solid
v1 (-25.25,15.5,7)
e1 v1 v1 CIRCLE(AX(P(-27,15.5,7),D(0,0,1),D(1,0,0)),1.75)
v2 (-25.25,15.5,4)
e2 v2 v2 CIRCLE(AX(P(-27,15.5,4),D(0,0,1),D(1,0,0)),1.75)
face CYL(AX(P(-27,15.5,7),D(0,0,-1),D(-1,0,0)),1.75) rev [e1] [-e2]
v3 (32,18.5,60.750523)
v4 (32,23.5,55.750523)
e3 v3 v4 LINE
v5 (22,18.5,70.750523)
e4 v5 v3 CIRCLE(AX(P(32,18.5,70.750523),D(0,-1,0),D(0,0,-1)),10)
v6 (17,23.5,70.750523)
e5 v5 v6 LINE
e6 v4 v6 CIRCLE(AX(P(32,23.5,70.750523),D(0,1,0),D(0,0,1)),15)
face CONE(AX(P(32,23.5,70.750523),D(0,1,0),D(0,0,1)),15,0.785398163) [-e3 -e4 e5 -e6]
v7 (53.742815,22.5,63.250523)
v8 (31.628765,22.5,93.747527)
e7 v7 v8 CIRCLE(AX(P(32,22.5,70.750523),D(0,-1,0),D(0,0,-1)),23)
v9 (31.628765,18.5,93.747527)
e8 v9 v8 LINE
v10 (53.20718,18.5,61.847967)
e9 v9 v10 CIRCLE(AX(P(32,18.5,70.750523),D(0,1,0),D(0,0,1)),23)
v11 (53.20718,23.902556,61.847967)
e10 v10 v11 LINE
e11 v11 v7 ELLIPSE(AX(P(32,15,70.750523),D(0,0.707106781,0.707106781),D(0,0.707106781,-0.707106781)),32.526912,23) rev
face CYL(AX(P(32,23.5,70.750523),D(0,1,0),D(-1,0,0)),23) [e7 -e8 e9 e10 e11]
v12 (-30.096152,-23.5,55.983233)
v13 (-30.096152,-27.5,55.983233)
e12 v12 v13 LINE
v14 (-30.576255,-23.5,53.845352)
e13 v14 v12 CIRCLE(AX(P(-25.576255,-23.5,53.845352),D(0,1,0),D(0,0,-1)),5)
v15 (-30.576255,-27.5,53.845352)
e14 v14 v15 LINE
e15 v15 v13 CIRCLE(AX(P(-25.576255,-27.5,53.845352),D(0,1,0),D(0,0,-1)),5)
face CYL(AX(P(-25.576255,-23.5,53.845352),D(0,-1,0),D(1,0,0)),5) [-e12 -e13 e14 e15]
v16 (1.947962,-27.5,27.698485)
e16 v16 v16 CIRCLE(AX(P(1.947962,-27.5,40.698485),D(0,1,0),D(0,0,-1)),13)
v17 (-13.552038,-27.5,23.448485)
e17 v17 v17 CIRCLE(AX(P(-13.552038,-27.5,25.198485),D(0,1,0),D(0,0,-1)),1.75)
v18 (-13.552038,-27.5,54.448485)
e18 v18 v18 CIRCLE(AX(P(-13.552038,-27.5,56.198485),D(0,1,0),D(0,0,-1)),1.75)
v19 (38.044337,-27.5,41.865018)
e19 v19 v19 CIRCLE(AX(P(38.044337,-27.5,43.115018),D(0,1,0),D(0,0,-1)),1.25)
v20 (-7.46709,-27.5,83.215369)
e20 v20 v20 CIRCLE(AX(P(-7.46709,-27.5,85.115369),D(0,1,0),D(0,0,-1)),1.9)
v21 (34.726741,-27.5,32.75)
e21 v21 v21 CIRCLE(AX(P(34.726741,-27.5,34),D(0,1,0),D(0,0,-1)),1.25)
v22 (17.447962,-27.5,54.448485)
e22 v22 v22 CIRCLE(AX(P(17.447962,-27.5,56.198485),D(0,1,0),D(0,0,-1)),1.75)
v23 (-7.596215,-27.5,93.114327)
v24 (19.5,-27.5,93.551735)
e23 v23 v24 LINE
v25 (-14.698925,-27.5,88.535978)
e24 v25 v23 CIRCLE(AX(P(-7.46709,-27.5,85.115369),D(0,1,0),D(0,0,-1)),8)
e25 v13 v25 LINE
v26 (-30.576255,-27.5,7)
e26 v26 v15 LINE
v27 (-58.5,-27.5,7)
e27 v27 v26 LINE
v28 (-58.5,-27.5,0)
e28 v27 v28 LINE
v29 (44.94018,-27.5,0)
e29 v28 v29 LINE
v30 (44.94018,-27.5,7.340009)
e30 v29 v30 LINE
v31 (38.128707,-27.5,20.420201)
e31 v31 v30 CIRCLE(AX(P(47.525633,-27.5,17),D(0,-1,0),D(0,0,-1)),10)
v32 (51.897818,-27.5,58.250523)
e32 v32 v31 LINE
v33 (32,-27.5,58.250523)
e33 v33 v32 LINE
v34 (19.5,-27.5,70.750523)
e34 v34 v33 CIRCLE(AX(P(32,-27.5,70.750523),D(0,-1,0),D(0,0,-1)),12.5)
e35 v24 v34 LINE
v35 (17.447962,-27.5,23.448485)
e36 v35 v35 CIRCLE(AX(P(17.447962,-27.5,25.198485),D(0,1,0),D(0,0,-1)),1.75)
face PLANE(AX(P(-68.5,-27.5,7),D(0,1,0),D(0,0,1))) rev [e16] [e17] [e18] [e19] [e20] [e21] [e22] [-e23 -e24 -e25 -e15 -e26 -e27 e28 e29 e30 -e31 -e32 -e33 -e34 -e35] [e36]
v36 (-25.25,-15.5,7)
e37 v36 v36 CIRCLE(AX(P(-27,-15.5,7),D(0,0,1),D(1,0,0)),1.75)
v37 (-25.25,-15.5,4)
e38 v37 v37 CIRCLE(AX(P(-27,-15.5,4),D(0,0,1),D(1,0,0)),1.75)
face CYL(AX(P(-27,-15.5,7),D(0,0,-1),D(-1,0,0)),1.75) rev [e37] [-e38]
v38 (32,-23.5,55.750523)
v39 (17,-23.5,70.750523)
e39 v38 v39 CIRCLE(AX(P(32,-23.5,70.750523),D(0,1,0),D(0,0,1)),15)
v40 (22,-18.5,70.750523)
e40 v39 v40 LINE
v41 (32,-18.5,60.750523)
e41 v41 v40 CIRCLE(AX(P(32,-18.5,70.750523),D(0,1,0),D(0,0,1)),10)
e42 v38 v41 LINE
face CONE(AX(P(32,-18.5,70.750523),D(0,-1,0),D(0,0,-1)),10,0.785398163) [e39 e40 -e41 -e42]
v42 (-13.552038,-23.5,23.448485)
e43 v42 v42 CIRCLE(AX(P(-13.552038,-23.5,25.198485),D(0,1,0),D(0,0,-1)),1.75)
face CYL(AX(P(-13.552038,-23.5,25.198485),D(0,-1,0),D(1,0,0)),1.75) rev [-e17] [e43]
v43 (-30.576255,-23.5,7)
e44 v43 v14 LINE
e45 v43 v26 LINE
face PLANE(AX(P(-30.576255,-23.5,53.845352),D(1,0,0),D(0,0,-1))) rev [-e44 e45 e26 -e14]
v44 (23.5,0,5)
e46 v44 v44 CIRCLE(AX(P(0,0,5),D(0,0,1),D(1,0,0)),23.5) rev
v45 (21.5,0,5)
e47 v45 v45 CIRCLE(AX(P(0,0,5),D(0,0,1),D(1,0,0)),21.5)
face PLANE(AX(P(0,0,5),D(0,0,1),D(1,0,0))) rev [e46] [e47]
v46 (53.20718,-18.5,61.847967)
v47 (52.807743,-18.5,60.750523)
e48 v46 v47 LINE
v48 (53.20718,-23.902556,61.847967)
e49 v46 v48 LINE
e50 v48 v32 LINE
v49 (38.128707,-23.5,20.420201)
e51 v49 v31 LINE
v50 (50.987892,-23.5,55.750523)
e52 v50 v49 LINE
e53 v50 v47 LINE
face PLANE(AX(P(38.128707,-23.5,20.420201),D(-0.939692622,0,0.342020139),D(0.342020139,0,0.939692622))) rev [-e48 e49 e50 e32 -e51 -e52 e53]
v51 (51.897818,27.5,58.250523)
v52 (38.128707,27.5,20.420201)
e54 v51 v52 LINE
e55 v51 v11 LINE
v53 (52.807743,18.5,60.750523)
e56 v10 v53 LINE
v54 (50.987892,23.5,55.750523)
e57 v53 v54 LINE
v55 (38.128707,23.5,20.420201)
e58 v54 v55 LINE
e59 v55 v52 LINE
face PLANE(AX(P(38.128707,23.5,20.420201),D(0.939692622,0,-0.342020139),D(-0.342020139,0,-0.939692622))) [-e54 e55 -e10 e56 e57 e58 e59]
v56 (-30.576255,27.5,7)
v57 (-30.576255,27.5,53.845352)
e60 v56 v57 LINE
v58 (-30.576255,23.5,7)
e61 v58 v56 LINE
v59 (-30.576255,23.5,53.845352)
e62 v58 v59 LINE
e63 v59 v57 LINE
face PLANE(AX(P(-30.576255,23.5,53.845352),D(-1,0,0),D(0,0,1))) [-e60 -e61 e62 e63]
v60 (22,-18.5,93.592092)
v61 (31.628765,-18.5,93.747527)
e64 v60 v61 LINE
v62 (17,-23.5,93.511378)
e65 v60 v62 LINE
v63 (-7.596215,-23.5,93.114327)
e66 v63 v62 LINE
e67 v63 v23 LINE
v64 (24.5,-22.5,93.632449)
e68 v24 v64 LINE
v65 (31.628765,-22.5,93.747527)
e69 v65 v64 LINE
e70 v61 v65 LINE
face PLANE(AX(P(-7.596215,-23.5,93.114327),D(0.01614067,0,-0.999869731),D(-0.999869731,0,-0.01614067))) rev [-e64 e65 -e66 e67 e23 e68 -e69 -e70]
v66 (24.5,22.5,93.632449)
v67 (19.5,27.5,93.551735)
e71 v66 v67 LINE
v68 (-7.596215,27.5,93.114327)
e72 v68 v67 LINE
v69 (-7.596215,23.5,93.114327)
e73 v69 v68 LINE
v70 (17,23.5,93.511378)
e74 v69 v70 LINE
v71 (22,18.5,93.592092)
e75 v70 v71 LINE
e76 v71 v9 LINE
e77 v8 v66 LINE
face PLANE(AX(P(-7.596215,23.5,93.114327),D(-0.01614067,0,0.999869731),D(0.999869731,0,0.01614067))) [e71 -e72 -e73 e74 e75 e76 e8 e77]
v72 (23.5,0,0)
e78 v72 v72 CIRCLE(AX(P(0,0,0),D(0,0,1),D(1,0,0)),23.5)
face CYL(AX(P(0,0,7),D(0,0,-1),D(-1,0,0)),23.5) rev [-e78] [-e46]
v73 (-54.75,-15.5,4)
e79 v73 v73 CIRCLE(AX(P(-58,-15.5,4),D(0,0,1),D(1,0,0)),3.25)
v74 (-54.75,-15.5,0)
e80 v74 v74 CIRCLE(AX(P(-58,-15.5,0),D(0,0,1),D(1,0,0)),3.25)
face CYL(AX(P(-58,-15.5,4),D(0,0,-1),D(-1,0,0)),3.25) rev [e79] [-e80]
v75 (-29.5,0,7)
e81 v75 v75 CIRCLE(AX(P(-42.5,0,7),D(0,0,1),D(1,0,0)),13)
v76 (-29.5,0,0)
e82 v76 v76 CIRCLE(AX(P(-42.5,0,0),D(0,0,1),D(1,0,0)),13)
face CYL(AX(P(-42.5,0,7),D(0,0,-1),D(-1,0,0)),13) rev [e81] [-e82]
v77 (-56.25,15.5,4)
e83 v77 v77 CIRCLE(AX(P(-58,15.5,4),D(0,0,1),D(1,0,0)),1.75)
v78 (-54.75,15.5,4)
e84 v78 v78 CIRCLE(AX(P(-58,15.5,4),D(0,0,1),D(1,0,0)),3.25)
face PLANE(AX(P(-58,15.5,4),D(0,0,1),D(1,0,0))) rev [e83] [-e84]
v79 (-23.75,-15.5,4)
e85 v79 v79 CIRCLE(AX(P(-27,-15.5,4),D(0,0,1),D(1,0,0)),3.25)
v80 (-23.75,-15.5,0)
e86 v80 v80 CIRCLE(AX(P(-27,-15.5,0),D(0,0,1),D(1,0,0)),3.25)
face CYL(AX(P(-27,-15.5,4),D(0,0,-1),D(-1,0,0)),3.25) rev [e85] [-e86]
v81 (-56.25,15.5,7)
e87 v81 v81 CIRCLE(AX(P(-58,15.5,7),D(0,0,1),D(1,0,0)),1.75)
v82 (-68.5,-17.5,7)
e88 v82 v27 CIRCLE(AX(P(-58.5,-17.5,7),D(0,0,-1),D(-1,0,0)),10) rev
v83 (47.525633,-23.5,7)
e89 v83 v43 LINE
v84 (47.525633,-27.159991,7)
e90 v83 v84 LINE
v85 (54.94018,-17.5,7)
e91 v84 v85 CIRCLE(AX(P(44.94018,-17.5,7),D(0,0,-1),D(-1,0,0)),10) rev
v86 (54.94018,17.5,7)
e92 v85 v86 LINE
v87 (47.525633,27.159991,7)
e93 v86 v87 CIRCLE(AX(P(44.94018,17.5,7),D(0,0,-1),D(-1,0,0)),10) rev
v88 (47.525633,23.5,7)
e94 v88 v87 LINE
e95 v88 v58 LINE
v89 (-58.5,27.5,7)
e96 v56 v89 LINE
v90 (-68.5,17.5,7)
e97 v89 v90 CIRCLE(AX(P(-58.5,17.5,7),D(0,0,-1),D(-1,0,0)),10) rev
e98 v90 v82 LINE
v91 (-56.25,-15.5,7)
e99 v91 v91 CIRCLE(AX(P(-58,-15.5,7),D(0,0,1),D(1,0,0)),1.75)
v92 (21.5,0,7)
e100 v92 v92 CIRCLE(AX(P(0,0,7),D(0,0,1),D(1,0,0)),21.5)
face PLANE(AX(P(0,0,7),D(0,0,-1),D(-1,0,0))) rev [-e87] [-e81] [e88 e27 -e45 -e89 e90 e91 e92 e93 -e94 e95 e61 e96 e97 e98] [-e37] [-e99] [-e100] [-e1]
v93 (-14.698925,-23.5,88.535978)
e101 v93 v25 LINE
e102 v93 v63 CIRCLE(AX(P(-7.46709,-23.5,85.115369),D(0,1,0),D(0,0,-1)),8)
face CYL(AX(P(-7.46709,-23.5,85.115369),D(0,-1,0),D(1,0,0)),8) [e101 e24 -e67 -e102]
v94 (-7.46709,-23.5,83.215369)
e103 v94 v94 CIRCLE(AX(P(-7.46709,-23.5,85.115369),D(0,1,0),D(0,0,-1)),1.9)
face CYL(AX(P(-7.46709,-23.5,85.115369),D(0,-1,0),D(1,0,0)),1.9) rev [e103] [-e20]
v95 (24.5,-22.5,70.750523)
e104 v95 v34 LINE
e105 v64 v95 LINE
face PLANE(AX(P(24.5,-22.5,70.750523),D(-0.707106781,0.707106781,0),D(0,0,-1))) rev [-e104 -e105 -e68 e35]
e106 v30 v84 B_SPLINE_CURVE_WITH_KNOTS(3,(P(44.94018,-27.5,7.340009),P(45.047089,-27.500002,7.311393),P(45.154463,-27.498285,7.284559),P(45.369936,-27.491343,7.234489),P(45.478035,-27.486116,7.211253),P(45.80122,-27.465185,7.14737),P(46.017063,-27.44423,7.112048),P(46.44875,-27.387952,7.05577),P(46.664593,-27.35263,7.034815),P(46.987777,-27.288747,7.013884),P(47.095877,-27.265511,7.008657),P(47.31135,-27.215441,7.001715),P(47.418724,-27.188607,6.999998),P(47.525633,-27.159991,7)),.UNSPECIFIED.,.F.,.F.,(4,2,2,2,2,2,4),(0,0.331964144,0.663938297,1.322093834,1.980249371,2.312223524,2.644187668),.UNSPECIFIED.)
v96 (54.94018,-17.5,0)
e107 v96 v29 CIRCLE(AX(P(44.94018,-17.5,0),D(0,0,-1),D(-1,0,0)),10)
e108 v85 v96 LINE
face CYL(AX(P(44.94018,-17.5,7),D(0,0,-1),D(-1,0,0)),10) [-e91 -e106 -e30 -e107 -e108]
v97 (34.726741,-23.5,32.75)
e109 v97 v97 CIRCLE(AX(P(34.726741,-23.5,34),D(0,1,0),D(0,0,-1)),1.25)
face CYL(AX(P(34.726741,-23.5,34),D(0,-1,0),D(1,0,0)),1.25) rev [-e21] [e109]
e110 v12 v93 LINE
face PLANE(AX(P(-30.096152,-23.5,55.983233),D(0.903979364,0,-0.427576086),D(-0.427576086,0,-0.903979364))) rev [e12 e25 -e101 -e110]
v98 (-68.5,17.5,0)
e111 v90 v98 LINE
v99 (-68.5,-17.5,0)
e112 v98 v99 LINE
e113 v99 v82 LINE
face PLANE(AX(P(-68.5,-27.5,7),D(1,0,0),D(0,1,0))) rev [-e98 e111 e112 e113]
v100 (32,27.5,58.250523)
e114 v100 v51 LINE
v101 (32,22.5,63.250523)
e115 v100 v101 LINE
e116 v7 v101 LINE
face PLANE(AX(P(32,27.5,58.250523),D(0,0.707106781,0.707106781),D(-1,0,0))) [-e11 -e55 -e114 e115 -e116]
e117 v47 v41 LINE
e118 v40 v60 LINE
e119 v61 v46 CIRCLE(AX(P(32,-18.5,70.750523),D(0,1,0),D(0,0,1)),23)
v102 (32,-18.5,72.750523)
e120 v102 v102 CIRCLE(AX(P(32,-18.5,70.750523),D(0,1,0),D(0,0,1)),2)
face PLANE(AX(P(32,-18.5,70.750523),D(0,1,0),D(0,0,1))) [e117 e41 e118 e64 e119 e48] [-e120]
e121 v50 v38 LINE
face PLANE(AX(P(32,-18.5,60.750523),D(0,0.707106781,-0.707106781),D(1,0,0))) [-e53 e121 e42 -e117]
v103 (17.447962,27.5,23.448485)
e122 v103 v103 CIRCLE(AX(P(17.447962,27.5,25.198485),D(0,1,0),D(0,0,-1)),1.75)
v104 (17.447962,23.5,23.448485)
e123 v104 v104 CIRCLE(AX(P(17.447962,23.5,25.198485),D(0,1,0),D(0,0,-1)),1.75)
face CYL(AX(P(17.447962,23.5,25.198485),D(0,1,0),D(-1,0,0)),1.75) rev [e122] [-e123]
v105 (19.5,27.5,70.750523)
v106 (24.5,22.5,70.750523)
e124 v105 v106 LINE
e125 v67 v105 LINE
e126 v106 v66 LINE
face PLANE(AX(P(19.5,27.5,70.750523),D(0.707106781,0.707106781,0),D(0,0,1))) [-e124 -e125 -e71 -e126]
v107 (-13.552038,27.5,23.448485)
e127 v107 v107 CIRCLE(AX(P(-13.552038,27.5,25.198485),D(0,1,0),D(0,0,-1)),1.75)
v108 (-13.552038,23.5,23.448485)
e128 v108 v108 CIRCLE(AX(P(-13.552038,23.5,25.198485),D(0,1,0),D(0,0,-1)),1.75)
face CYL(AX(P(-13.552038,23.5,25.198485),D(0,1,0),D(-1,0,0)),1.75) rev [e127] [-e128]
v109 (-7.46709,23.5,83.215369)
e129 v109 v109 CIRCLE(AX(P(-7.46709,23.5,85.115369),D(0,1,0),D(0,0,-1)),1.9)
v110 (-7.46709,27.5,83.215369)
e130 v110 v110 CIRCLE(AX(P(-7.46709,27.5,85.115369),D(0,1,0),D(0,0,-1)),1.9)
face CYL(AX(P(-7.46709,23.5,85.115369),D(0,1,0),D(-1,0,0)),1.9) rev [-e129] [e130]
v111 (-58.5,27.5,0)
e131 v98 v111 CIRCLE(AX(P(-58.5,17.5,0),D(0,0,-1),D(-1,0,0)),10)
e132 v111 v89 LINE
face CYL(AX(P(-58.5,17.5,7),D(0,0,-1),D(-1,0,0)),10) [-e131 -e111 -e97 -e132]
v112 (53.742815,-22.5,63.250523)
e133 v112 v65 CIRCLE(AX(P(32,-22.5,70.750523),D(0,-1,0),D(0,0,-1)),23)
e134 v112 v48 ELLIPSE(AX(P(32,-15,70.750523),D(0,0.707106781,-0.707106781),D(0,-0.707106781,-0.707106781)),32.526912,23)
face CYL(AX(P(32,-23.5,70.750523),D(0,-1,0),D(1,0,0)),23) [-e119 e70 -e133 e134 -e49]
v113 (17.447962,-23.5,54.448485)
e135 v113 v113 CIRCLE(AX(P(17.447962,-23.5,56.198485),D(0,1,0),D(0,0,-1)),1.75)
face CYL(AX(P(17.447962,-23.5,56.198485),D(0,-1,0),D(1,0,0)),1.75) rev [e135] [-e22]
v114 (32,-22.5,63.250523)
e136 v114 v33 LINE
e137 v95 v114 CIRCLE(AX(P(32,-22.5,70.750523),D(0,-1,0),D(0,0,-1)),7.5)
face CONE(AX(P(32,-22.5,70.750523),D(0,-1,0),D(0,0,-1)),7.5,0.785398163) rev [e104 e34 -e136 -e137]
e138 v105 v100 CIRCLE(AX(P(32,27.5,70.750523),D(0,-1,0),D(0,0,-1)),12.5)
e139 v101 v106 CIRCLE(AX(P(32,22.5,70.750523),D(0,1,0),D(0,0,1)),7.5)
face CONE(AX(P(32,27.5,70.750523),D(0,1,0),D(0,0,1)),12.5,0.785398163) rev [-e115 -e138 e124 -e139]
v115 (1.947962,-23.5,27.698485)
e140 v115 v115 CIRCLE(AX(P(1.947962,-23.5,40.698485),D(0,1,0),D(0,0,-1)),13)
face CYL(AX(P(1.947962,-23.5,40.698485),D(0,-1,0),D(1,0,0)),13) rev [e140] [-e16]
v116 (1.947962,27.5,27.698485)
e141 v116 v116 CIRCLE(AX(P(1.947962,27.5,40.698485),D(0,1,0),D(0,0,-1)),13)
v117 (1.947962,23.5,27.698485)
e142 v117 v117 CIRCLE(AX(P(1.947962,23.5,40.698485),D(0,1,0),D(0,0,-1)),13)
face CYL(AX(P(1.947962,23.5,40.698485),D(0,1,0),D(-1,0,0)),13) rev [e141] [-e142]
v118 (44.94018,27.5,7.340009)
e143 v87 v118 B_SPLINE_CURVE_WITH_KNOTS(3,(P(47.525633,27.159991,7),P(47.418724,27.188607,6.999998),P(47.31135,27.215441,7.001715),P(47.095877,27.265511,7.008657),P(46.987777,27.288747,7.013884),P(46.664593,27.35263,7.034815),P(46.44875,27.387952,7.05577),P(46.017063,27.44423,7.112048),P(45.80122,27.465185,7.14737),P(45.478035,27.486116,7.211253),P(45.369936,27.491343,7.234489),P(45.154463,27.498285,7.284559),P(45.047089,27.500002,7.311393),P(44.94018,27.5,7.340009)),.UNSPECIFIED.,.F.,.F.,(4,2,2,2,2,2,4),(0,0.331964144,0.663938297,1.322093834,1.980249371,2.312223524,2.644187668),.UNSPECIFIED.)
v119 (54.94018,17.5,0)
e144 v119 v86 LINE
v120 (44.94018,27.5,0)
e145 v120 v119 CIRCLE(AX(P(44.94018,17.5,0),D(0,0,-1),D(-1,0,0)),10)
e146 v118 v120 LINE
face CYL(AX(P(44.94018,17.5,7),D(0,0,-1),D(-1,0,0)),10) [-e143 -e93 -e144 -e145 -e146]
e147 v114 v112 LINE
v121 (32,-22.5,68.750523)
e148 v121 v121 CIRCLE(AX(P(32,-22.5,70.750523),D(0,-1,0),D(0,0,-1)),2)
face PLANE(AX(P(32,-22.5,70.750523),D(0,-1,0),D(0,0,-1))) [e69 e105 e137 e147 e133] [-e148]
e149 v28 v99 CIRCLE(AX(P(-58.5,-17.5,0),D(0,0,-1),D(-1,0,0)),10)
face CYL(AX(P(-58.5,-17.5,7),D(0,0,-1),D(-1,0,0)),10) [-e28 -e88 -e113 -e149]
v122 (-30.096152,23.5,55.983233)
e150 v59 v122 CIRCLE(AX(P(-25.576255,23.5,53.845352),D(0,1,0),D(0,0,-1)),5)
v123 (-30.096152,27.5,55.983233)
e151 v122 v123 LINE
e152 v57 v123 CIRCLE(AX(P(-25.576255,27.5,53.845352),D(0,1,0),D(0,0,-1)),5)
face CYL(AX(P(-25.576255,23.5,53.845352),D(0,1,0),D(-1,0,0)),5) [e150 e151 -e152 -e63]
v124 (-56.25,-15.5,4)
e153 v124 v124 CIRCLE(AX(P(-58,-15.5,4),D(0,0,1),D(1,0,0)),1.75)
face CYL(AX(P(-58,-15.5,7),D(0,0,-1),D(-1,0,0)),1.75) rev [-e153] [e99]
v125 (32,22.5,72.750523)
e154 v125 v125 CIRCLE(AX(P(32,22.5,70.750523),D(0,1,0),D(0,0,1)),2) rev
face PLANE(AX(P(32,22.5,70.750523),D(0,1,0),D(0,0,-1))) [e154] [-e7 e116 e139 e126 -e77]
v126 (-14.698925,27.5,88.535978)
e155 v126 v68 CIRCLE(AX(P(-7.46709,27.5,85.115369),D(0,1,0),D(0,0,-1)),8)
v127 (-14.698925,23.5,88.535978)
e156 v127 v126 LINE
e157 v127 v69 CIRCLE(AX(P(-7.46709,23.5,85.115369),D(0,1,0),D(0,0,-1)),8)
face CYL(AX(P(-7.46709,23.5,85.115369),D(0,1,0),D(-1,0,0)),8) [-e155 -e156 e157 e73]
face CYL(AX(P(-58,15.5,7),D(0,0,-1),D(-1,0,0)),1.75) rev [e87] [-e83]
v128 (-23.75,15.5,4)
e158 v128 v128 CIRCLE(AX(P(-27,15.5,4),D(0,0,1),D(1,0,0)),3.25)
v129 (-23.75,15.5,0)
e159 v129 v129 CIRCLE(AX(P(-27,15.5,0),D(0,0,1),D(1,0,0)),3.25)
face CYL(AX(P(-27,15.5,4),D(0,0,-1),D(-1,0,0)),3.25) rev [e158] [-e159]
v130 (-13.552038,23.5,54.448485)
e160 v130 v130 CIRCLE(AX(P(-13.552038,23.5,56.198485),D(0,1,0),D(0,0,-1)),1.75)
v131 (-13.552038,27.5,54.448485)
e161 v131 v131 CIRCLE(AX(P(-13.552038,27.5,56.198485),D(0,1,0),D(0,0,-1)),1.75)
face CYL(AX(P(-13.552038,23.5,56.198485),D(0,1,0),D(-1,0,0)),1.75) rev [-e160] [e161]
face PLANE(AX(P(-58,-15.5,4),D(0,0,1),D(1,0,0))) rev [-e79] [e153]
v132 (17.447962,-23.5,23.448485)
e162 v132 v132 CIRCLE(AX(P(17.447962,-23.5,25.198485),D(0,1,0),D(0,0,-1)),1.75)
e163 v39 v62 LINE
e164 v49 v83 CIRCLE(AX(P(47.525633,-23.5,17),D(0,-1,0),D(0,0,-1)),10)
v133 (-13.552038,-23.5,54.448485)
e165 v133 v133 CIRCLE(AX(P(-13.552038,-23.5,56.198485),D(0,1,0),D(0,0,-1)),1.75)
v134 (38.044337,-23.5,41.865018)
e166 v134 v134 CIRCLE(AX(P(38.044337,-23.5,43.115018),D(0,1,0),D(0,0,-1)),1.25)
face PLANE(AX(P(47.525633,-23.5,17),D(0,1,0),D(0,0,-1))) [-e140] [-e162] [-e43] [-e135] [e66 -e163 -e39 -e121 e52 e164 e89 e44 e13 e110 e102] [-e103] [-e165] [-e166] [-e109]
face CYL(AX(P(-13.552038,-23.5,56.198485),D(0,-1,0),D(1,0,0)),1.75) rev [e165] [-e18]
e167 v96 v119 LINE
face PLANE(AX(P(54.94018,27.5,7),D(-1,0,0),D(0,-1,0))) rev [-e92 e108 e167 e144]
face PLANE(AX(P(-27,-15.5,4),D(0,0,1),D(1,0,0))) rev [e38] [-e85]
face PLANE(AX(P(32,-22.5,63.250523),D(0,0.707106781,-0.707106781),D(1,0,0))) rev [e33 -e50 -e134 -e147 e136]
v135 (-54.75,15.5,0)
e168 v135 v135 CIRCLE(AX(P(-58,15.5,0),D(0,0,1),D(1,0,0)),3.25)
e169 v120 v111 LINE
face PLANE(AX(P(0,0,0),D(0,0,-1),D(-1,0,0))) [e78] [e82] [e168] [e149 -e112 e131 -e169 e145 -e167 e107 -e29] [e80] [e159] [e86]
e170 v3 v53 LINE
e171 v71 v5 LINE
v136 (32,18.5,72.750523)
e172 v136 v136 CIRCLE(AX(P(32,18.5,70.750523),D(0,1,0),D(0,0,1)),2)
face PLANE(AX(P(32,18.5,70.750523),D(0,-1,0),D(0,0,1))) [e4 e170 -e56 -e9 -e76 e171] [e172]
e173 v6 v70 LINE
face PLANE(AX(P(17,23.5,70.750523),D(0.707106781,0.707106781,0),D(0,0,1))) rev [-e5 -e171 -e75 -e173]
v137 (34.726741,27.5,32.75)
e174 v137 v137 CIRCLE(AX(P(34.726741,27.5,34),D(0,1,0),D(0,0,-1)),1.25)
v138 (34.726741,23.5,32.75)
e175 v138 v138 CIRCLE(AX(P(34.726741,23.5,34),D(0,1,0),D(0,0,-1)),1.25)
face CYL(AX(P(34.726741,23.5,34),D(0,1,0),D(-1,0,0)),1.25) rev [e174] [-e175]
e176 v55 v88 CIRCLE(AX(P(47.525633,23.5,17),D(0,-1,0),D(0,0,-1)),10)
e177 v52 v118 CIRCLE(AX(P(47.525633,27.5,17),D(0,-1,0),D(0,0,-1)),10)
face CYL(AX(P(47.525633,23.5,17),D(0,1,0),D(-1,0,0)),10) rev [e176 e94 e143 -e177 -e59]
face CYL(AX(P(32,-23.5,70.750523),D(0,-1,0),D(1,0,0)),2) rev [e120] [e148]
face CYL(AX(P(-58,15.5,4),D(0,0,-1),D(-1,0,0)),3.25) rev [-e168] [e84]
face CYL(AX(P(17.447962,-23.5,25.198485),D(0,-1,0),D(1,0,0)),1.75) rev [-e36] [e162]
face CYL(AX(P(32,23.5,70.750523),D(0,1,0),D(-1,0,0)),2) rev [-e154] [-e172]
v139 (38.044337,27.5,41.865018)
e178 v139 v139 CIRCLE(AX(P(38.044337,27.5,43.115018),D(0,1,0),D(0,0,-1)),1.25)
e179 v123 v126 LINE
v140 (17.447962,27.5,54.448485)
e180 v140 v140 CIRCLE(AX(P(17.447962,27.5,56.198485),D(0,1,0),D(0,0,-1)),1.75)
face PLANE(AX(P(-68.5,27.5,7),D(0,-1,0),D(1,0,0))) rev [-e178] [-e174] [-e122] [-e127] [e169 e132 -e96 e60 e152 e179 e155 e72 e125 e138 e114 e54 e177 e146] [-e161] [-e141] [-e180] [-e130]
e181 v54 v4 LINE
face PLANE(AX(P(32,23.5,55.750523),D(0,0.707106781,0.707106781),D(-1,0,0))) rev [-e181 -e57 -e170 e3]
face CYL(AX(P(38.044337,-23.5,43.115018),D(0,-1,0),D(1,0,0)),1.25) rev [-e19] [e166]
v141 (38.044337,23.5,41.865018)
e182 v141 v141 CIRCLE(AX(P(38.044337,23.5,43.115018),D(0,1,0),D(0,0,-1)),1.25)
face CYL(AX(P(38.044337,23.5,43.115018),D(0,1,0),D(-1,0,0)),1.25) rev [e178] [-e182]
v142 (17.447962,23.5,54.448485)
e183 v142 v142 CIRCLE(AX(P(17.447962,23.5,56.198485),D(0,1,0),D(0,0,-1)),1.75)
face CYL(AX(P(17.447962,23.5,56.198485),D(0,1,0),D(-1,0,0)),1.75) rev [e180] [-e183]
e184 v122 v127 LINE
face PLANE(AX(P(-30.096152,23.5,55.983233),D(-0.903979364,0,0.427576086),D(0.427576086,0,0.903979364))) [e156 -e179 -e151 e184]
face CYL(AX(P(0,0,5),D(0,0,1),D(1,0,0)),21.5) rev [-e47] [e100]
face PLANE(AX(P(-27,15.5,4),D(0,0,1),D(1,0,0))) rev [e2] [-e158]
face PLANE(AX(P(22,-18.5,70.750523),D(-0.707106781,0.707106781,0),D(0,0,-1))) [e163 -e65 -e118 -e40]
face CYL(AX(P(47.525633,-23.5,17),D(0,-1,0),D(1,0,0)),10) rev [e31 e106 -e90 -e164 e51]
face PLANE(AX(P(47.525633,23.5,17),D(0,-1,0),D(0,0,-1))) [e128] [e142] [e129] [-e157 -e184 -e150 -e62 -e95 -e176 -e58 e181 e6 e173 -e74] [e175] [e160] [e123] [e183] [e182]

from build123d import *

# Parameters (mm, degrees)
SKETCH_2_R                 = 23.499999999999854
SKETCH_2_R_2               = 12.9999999999999
SKETCH_2_R_3               = 1.7499999999999183
EXTRUDE_1_DEPTH            = 7
SKETCH_5_R                 = 1.2499999999997513
SKETCH_5_R_2               = 1.9999999999997797
SKETCH_5_R_3               = 12.9999999999999
SKETCH_5_R_4               = 1.7500000000003624
SKETCH_5_R_5               = 1.9000000000000128
EXTRUDE_3_DEPTH            = 4
EXTRUDE_START              = -2
SKETCH_6_R                 = 23.499999999999854
SKETCH_6_R_2               = 21.49999999999985
EXTRUDE_4_DEPTH            = 2
FILLET_1_R                 = 10
SKETCH_7_R                 = 3.2500000000000013
SKETCH_7_R_2               = 3.2500000000000004
SKETCH_7_R_3               = 3.250000000000001
CUT_EXTRUDE_4_DEPTH        = 4
SKETCH_18_R                = 1.999999999999777
EXTRUDE_7_DEPTH            = 5
CUT_EXTRUDE_5_DEPTH        = 5
CHAMFER_8_SIZE             = 5
CHAMFER_8_OF_MIRROR_2_SIZE = 5


with BuildPart() as part:
    # 草图2 → 凸台-拉伸1 (new body)
    with BuildSketch(Plane.XY):
        Polygon((-68.50000000000378, -27.499999999999968), (54.94017961354203, -27.499999999999968), (54.94017961354159, 27.4999999999998), (-68.5000000000029, 27.499999999999968), align=None)
        Circle(SKETCH_2_R, mode=Mode.SUBTRACT)
        with Locations((-42.50000000000354, -1.22125e-12)):
            Circle(SKETCH_2_R_2, mode=Mode.SUBTRACT)
        with Locations((-27.000000000003688, 15.499999999998737)):
            Circle(SKETCH_2_R_3, mode=Mode.SUBTRACT)
        with Locations((-27.000000000005464, -15.500000000002178)):
            Circle(SKETCH_2_R_3, mode=Mode.SUBTRACT)
        with Locations((-58.00000000000427, -15.500000000002068)):
            Circle(SKETCH_2_R_3, mode=Mode.SUBTRACT)
        with Locations((-58.00000000000294, 15.499999999998737)):
            Circle(SKETCH_2_R_3, mode=Mode.SUBTRACT)
    extrude(amount=EXTRUDE_1_DEPTH)

    # 草图5 → 凸台-拉伸3 (add)
    with BuildSketch(Plane(origin=(3.71e-14, 27.499999999999876, 0), x_dir=(1, -1.35e-15, 0), z_dir=(1.35e-15, 1, 0))):
        with BuildLine():
            Line((-30.57625495627559, -6.9999999999999964), (47.52563316823275, -6.999999999999941))
            ThreePointArc((47.52563316823275, -6.999999999999941), (39.334112738152676, -11.264235618194132), (38.128706945095715, -20.420201391282454))
            Line((38.128706945095715, -20.420201391282454), (53.20718018719004, -61.84796671962179))
            ThreePointArc((53.20718018719004, -61.84796671962179), (51.05071212212322, -83.63735224169075), (31.628764590502435, -93.74752682099374))
            Line((31.628764590502435, -93.74752682099374), (-7.596215432832855, -93.11432687715183))
            ThreePointArc((-7.596215432832855, -93.11432687715183), (-11.801401356788567, -91.83948575225449), (-14.698924987474284, -88.53597771406503))
            Line((-14.698924987474284, -88.53597771406503), (-30.096151777816445, -55.98323269965879))
            ThreePointArc((-30.096151777816445, -55.98323269965879), (-30.454752886360815, -54.940915116534505), (-30.576254956274703, -53.84535227208149))
            Line((-30.576254956274703, -53.84535227208149), (-30.57625495627559, -6.9999999999999964))
        make_face()
        with Locations(Location((34.72674141312202, -34.00000000000005, 0), (0, 0, 90))):
            Circle(SKETCH_5_R, mode=Mode.SUBTRACT)
        with Locations(Location((38.04433676266059, -43.11501843644486, 0), (0, 0, 90))):
            Circle(SKETCH_5_R, mode=Mode.SUBTRACT)
        with Locations(Location((32.00000000000001, -70.75052301026328, 0), (0, 0, 90))):
            Circle(SKETCH_5_R_2, mode=Mode.SUBTRACT)
        with Locations(Location((1.9479617995710048, -40.698484809835, 0), (0, 0, 90))):
            Circle(SKETCH_5_R_3, mode=Mode.SUBTRACT)
        with Locations(Location((-13.552038200428397, -56.19848480983506, 0), (0, 0, 90))):
            Circle(SKETCH_5_R_4, mode=Mode.SUBTRACT)
        with Locations(Location((17.447961799570404, -56.198484809835, 0), (0, 0, 90))):
            Circle(SKETCH_5_R_4, mode=Mode.SUBTRACT)
        with Locations(Location((17.447961799569516, -25.198484809834156, 0), (0, 0, 90))):
            Circle(SKETCH_5_R_4, mode=Mode.SUBTRACT)
        with Locations(Location((-13.552038200430173, -25.19848480983421, 0), (0, 0, 90))):
            Circle(SKETCH_5_R_4, mode=Mode.SUBTRACT)
        with Locations(Location((-7.467090073007844, -85.11536902994133, 0), (0, 0, 90))):
            Circle(SKETCH_5_R_5, mode=Mode.SUBTRACT)
    extrude_3 = extrude(amount=-EXTRUDE_3_DEPTH)

    # 草图6 → 凸台-拉伸4 (add)
    with BuildSketch(Plane.XY.offset(7).offset(EXTRUDE_START)):
        Circle(SKETCH_6_R)
        Circle(SKETCH_6_R_2, mode=Mode.SUBTRACT)
    extrude(amount=EXTRUDE_4_DEPTH)

    # 镜向1: 凸台-拉伸3 across plane
    add(extrude_3.mirror(Plane.ZX))

    # 圆角1
    fillet_1_edges = [part.edges().sort_by_distance(p)[0] for p in [
        (-68.5000000000029, 27.499999999999968, 3.5),
        (54.94017961354159, 27.4999999999998, 3.5),
        (54.94017961354203, -27.499999999999968, 3.5),
        (-68.50000000000378, -27.499999999999968, 3.5),
    ]]
    fillet(fillet_1_edges, radius=FILLET_1_R)

    # 草图7 → 切除-拉伸4 (cut)
    with BuildSketch(Plane.XY):
        with Locations((-58.00000000000294, 15.499999999998737)):
            Circle(SKETCH_7_R)
        with Locations((-27.000000000003688, 15.499999999998737)):
            Circle(SKETCH_7_R_2)
        with Locations((-27.000000000005464, -15.500000000002178)):
            Circle(SKETCH_7_R_2)
        with Locations((-58.00000000000427, -15.500000000002068)):
            Circle(SKETCH_7_R_3)
    extrude(amount=CUT_EXTRUDE_4_DEPTH, mode=Mode.SUBTRACT)

    # 草图18 → 凸台-拉伸7 (add)
    with BuildSketch(Plane(origin=(3.17e-14, -23.499999999999826, -1.641e-13), x_dir=(1, 1.35e-15, 0), z_dir=(-1.35e-15, 1, 6.98e-15))):
        with BuildLine():
            Line((32.00000000000008, -55.750523010263095), (50.98789220271744, -55.750523010263095))
            Line((50.98789220271744, -55.750523010263095), (53.20718018719011, -61.847966719621596))
            ThreePointArc((53.20718018719011, -61.847966719621596), (51.05071212212356, -83.63735224169073), (31.62876459050252, -93.74752682099322))
            Line((31.62876459050252, -93.74752682099322), (17.000000000000078, -93.51137799665558))
            Line((17.000000000000078, -93.51137799665558), (17.000000000000078, -70.7505230102631))
            ThreePointArc((17.000000000000078, -70.7505230102631), (21.393398282201865, -60.14392129246488), (32.00000000000008, -55.750523010263095))
        make_face()
        with Locations(Location((32.00000000000008, -70.7505230102631, 0), (0, 0, 90))):
            Circle(SKETCH_18_R, mode=Mode.SUBTRACT)
    extrude_7 = extrude(amount=EXTRUDE_7_DEPTH)

    # 草图9 → 切除-拉伸5 (cut)
    with BuildSketch(Plane.XZ.offset(27.499999999999968)):
        with BuildLine():
            Line((19.50000000000005, 70.75052301026328), (19.500000000000046, 93.55173492886229))
            Line((19.500000000000046, 93.55173492886229), (31.628764590502485, 93.74752682099341))
            ThreePointArc((31.628764590502485, 93.74752682099341), (51.05071212212326, 83.63735224169075), (53.207180187190076, 61.84796671962179))
            Line((53.207180187190076, 61.84796671962179), (51.89781777573519, 58.25052301026329))
            Line((51.89781777573519, 58.25052301026329), (32.00000000000004, 58.25052301026329))
            ThreePointArc((32.00000000000004, 58.25052301026329), (23.161165235168202, 61.91168824543144), (19.50000000000005, 70.75052301026328))
        make_face()
    cut_extrude_5 = extrude(amount=-CUT_EXTRUDE_5_DEPTH, mode=Mode.SUBTRACT)

    # 倒角8
    chamfer_8_edges = [part.edges().sort_by_distance(p)[0] for p in [
        (41.94890888786762, -22.499999999999968, 58.25052301026329),
        (23.161165235168205, -22.499999999999968, 61.91168824543144),
        (19.50000000000005, -22.499999999999968, 82.15112896956279),
        (41.49394610135879, -18.50000000000016, 55.75052301026297),
        (21.39339828220189, -18.500000000000217, 60.14392129246475),
        (17.000000000000103, -18.500000000000377, 82.1309505034592),
    ]]
    chamfer(chamfer_8_edges, length=CHAMFER_8_SIZE - 0.0001)  # a hair under: the kernel refuses the full size

    # 镜向2: 凸台-拉伸7, 切除-拉伸5 across plane
    add(extrude_7.mirror(Plane.ZX))
    add(cut_extrude_5.mirror(Plane.ZX), mode=Mode.SUBTRACT)

    # 倒角8 of 镜向2
    chamfer_8_of_mirror_2_edges = [part.edges().sort_by_distance(p)[0] for p in [
        (41.94890888786762, 22.499999999999968, 58.25052301026329),
        (23.161165235168205, 22.499999999999968, 61.91168824543144),
        (19.50000000000005, 22.499999999999968, 82.15112896956279),
        (41.49394610135879, 18.500000000000153, 55.75052301026297),
        (21.39339828220189, 18.500000000000217, 60.14392129246475),
        (17.000000000000103, 18.50000000000038, 82.1309505034592),
    ]]
    chamfer(chamfer_8_of_mirror_2_edges, length=CHAMFER_8_OF_MIRROR_2_SIZE - 0.0001)  # a hair under: the kernel refuses the full size


solid = part.part
